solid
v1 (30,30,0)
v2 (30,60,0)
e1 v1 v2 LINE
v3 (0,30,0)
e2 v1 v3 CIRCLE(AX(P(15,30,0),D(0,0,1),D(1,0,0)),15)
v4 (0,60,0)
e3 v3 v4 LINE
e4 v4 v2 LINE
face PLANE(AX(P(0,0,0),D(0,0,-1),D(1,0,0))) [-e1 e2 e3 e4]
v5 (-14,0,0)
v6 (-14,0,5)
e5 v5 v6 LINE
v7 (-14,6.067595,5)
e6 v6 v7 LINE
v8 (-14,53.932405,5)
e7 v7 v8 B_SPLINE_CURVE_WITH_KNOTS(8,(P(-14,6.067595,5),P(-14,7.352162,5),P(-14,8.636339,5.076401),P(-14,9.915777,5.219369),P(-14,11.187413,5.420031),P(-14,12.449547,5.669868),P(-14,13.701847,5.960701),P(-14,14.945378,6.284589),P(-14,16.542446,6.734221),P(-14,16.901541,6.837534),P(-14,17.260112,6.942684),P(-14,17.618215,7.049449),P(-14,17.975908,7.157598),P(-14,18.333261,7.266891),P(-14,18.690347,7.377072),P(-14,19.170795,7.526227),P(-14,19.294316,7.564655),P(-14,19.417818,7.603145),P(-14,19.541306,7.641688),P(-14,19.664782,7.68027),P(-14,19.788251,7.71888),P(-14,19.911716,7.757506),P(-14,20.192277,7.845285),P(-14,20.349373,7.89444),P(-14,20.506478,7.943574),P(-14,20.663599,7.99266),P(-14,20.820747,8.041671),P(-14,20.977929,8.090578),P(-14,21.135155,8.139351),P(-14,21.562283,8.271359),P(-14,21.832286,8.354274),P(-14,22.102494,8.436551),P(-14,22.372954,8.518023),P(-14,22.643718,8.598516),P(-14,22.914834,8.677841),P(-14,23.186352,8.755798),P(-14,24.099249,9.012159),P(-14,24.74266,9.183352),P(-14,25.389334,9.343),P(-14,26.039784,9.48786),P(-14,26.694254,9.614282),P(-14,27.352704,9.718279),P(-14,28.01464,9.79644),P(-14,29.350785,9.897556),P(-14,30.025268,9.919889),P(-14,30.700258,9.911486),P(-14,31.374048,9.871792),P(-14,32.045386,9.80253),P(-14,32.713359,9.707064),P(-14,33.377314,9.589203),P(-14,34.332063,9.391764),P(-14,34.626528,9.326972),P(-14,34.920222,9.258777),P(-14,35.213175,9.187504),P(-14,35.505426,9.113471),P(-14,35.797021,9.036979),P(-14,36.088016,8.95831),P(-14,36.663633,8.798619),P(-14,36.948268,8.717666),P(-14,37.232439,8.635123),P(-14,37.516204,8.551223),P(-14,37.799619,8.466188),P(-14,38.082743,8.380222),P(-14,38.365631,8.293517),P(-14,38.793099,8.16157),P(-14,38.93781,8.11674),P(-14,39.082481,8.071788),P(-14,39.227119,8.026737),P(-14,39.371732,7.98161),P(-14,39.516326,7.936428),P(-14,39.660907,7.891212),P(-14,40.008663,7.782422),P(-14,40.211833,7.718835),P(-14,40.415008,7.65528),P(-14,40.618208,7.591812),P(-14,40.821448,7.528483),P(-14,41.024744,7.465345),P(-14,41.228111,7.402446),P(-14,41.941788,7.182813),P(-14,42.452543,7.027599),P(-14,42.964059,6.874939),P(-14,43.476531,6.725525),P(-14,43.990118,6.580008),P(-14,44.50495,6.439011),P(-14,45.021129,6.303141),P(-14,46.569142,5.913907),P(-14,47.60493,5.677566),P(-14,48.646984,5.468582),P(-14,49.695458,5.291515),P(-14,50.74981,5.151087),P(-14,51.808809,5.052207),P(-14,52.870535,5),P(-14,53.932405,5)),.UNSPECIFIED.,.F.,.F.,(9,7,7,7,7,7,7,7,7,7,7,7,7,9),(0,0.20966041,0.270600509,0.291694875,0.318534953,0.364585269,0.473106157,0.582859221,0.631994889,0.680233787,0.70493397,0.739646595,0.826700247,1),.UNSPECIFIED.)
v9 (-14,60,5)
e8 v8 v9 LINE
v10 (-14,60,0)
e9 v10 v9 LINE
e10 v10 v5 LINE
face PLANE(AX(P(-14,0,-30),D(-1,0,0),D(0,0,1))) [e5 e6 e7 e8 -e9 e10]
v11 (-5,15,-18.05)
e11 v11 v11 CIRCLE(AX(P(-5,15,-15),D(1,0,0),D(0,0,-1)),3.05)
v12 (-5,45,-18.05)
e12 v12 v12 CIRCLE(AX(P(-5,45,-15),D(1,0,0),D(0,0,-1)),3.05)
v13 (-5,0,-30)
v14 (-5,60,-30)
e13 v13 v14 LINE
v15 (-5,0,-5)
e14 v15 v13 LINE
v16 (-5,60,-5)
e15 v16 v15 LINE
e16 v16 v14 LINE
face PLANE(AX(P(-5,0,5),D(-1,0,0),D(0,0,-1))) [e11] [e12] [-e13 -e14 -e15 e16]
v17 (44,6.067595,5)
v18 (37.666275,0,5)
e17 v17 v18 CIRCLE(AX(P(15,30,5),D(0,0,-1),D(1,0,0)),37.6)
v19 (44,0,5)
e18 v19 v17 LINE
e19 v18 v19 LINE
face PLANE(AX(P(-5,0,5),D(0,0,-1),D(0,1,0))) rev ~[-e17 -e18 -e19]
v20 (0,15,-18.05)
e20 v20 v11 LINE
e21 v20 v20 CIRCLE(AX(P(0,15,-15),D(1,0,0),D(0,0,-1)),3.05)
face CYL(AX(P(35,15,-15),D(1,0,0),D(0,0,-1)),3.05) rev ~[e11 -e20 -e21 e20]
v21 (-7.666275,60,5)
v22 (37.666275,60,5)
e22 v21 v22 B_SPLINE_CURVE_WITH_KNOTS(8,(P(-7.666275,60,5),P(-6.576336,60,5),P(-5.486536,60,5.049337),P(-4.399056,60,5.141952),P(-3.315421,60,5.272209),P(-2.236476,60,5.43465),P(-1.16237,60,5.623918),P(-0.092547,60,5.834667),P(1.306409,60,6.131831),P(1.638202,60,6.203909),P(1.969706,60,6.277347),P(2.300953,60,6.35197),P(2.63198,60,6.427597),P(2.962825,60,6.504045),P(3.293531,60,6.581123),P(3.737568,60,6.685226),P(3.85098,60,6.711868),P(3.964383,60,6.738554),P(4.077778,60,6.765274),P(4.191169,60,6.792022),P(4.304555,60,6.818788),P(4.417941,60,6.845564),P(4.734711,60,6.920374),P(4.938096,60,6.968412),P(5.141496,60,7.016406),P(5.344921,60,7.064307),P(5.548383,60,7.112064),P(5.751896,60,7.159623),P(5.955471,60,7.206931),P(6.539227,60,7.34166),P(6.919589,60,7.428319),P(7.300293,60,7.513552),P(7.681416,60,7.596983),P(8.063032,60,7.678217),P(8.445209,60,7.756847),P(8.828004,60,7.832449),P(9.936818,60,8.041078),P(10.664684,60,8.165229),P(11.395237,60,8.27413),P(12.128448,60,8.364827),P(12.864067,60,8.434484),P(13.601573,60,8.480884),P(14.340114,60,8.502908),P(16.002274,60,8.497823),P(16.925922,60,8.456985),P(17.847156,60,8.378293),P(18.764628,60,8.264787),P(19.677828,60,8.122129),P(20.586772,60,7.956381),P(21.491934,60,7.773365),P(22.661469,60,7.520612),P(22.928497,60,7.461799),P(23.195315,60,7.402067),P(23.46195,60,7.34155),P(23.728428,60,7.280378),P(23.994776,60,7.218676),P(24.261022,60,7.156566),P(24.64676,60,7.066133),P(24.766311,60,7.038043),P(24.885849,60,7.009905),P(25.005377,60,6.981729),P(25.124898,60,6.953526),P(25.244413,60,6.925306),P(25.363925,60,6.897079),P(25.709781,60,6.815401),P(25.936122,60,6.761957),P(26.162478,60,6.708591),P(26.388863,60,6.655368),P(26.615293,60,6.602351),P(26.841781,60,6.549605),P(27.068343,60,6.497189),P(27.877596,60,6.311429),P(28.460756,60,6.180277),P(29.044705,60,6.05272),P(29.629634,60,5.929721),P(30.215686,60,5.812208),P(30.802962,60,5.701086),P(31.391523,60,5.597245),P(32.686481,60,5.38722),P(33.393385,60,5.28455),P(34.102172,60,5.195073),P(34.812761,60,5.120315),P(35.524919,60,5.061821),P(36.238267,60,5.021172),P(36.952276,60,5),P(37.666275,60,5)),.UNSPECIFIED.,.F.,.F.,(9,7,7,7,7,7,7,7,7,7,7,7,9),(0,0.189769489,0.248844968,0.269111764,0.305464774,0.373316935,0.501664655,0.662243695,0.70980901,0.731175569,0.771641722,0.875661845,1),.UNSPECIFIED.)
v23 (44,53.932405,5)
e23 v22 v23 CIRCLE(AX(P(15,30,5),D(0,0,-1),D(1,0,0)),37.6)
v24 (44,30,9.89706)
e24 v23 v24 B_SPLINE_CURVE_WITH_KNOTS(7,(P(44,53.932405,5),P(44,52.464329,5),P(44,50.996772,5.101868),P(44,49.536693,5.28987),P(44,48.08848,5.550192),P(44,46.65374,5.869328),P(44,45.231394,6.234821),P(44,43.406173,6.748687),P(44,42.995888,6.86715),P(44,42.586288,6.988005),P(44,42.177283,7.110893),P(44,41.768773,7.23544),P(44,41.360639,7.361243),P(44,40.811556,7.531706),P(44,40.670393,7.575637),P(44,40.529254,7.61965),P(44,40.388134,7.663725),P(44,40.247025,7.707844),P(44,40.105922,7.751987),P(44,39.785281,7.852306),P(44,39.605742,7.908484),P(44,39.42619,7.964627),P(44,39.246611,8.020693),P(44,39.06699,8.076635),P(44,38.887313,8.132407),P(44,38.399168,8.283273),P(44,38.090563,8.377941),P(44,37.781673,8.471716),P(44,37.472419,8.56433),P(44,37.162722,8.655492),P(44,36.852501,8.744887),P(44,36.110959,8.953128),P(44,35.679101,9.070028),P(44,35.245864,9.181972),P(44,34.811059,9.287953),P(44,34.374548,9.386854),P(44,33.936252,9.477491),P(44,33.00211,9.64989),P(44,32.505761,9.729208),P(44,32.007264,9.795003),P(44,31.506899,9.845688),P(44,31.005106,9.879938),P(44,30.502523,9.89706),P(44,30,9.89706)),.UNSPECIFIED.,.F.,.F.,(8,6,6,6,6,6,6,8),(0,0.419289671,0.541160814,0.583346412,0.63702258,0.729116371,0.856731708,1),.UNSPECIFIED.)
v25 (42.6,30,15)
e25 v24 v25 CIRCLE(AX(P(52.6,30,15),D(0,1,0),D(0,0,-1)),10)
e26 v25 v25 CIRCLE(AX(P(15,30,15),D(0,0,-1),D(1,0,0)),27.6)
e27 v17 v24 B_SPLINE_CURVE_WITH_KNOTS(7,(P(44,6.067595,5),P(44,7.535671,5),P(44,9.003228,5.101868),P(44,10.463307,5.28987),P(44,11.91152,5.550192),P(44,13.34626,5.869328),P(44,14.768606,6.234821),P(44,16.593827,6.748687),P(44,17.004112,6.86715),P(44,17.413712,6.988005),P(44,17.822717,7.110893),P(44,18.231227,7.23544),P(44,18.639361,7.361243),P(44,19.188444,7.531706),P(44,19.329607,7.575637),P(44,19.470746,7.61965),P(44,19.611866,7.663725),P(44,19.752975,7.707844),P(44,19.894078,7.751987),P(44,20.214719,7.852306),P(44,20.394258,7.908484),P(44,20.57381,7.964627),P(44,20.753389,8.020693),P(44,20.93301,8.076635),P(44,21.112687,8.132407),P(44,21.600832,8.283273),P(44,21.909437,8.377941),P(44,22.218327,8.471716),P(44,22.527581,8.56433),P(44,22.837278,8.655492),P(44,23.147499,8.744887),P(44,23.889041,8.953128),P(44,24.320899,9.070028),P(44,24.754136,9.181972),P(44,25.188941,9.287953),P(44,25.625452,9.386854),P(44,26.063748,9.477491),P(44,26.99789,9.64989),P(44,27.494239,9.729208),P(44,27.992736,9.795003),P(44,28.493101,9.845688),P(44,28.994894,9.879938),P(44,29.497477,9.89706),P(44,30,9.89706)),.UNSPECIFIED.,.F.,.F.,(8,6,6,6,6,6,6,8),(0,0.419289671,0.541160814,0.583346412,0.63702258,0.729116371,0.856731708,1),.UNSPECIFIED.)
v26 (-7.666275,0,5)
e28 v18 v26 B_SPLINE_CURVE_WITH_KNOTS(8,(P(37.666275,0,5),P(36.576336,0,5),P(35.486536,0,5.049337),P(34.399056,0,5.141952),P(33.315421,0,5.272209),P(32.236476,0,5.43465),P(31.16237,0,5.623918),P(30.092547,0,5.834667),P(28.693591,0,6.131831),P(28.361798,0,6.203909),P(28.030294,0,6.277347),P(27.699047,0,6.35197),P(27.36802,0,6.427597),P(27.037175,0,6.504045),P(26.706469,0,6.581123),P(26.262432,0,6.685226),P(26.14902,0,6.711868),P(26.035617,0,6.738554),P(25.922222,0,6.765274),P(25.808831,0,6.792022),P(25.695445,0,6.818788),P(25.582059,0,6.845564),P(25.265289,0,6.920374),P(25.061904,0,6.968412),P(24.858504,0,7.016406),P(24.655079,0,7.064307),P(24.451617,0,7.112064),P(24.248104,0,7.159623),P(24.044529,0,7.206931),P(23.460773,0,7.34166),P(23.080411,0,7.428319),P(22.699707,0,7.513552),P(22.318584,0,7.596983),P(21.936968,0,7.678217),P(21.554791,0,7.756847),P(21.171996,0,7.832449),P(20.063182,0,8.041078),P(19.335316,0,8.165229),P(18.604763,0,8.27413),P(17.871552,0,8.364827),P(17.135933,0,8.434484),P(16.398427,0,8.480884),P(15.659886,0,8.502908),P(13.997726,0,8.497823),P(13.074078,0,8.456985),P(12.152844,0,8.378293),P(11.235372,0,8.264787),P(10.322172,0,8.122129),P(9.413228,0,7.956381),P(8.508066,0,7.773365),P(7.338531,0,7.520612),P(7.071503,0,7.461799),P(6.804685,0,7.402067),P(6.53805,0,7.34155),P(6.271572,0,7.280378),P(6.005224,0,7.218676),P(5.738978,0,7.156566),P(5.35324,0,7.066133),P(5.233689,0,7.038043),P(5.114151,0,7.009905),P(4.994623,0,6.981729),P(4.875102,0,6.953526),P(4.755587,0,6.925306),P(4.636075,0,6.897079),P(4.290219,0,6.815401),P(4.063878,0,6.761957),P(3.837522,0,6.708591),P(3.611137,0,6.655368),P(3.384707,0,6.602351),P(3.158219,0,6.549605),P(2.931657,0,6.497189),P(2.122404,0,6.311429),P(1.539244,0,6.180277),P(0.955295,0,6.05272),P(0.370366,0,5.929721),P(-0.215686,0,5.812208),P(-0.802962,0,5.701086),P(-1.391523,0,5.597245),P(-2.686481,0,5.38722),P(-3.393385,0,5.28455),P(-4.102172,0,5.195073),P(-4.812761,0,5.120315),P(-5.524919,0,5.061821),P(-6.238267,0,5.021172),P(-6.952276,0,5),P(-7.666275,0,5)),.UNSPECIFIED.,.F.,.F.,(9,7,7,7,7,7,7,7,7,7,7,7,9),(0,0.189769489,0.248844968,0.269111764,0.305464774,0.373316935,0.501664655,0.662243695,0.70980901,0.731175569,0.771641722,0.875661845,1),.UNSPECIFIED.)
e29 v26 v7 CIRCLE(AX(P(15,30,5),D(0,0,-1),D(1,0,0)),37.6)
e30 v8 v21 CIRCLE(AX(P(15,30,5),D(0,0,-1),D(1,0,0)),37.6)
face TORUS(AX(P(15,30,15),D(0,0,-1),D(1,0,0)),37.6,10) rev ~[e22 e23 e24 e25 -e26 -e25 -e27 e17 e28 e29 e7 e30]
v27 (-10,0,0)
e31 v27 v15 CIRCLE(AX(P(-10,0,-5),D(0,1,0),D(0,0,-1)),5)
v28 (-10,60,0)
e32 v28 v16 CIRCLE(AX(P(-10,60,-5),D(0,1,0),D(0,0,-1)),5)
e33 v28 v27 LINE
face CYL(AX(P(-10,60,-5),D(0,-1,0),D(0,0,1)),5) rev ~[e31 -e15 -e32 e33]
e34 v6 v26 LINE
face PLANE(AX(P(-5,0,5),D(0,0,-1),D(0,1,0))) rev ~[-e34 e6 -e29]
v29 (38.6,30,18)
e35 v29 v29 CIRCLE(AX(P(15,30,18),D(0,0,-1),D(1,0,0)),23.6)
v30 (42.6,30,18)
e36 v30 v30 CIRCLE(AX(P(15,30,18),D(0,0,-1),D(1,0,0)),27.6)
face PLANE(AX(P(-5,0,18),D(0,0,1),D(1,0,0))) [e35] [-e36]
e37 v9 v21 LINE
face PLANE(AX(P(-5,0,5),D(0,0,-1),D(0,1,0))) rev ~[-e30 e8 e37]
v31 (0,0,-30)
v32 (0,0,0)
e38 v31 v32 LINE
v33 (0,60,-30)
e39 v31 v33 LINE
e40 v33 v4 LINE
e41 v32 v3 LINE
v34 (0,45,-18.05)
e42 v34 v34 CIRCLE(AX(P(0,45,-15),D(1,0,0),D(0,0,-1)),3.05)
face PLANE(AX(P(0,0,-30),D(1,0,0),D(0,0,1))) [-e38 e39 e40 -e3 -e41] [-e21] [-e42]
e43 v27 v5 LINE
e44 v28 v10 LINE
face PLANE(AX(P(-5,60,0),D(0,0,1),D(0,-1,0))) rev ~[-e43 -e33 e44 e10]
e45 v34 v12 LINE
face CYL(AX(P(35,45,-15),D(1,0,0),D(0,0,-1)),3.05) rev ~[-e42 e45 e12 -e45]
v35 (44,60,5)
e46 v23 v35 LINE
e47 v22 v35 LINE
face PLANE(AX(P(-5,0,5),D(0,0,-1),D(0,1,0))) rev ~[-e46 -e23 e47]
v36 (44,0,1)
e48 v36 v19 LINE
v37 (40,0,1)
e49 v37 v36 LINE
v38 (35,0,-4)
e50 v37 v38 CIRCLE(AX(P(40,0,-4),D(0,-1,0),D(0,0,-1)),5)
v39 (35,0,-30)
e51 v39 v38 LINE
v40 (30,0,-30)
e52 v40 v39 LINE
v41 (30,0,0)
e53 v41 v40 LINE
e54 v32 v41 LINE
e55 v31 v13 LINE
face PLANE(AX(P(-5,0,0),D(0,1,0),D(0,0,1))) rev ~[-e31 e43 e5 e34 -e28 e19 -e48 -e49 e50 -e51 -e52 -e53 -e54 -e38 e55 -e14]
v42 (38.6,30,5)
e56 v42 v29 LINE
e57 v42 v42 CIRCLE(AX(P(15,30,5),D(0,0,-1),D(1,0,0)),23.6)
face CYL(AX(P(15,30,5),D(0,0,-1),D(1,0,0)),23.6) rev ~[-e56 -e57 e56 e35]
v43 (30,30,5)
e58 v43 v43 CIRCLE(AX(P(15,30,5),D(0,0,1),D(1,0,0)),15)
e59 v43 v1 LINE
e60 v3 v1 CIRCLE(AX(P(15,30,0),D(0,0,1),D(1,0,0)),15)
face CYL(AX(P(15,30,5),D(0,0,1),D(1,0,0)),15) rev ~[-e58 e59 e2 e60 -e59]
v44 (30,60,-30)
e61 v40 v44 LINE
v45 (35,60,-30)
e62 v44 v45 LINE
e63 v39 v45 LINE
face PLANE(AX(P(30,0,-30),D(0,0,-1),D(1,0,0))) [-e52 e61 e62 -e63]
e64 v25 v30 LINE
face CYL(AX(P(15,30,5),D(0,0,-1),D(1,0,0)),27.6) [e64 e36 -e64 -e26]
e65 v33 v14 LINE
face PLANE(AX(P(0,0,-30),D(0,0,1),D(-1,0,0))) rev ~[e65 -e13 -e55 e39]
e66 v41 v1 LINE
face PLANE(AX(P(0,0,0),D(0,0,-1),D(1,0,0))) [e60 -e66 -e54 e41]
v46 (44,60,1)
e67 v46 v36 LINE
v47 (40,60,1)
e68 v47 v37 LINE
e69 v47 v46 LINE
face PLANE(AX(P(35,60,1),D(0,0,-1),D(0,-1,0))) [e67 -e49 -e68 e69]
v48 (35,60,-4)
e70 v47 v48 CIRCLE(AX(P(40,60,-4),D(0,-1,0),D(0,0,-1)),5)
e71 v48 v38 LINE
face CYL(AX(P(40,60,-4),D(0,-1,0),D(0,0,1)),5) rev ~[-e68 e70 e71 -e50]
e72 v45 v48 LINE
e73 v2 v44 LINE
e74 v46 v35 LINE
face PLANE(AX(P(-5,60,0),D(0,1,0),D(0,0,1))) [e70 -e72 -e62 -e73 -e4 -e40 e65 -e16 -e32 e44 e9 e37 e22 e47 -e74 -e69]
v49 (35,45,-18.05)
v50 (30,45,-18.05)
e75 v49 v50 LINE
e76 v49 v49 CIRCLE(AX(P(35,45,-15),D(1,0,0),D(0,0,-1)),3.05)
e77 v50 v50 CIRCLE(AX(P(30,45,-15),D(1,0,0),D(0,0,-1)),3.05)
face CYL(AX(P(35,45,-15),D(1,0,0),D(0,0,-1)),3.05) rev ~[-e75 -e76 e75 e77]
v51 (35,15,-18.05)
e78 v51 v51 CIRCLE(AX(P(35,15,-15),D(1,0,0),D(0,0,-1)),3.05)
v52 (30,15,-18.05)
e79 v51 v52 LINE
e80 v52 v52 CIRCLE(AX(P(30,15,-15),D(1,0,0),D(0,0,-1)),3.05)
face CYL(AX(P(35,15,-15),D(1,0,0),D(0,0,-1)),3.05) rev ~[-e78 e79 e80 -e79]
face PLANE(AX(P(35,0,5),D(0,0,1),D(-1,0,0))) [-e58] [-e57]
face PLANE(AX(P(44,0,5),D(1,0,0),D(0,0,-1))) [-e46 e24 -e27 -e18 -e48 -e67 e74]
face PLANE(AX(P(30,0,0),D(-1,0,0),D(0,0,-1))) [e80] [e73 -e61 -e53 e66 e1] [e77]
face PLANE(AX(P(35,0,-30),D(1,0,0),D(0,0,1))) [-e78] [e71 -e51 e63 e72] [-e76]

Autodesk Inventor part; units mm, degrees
ref_plane "YZ Plane" through (0, 0, 0) normal (1, 0, 0) x (0, 1, 0)
ref_plane "XZ Plane" through (0, 0, 0) normal (0, 1, 0) x (-1, 0, 0)
ref_plane "XY Plane" through (0, 0, 0) normal (0, 0, 1) x (1, 0, 0)
sketch "Sketch1" plane through (0, 0, 0) normal (0, 1, 0) x (-1, 0, 0)
  line L0 (0, 0) -> (-30, 0)
  line L1 (-30, 0) -> (-30, -30)
  line L2 (-30, -30) -> (0, -30)
  line L3 (0, -30) -> (0, 0)
  line L4 (-35, -35) -> (-35, 5)
  line L5 (-35, 5) -> (5, 5)
  line L6 (5, 5) -> (5, -35)
  line L7 (5, -35) -> (-35, -35)
  line L8 (0, -30) -> (5, -30)
  line L9 (-30, -30) -> (-35, -30)
  dimension "d0" = 30
  dimension "d1" = 30
  dimension "d2" = 5
extrude "Extrusion1" add sketch "Sketch1" along normal blind 60 contours L0 L1 L9 L4 L5 L6 L8 L3
sketch "Sketch2" plane through (-5, 0, 5) normal (0, 0, 1) x (1, 0, 0)
  line L0 (0, 0) -> (40, 0) projected
  line L1 (40, 0) -> (40, 60) projected
  line L2 (0, 60) -> (40, 60) projected
  line L3 (0, 0) -> (0, 60) projected
  line L4 (0, 60) -> (40, 60) projected
  line L5 (0, 0) -> (40, 0) projected
  line L6 (0, 60) -> (40, 0) construction
  circle A0 centre (20, 30) radius 23.6
  circle A1 centre (20, 30) radius 27.6
  dimension "d5" = 47.2
  dimension "d6" = 4
extrude "Extrusion2" add sketch "Sketch2" along normal blind 13 contours A1 L3 A0 | L3 A0 L1 A1 | L1 A0 A1 | A1 L1 A0 L3
sketch "Sketch3" plane through (35, 0, 5) normal (1, 0, 0) x (0, 0, -1)
  line L0 (5, 60) -> (35, 60) projected
  line L1 (35, 60) -> (0, 60) projected
  line L2 (5, 0) -> (35, 0) projected
  line L3 (0, 60) -> (4, 60)
  line L4 (4, 60) -> (4, 0)
  line L5 (4, 0) -> (0, 0)
  line L6 (0, 0) -> (0, 60)
  point P0 (4, 60)
  dimension "d10" = 4
extrude "Extrusion3" add sketch "Sketch3" along normal blind 9
sketch "Sketch4" plane through (-5, 0, -30) normal (-1, 0, 0) x (0, 0, 1)
  line L0 (0, 60) -> (35, 60) projected
  line L1 (30, 0) -> (0, 0) projected
  line L2 (35, 60) -> (30, 60)
  line L3 (30, 60) -> (30, 0)
  line L4 (30, 0) -> (35, 0)
  line L5 (35, 0) -> (35, 60)
extrude "Extrusion4" add sketch "Sketch4" along normal blind 9
sketch "Sketch5" plane through (15, 30, 5) normal (0, 0, 1) x (1, 0, 0)
  circle A0 centre (0, 0) radius 23.6 projected
  circle A1 centre (0, 0) radius 15
  point P0 (-15, -30)
  dimension "d15" = 30
extrude "Extrusion5" cut sketch "Sketch5" against normal blind 9 contours A1
fillet "Fillet1" radius 10 1 edges at (-12.6, 30, 5)
sketch "Sketch7" plane through (35, 0, -30) normal (1, 0, 0) x (0, 0, -1)
  line L0 (-31, 60) -> (-31, 0) projected
  line L1 (-31, 0) -> (0, 0) projected
  line L2 (0, 0) -> (0, 60) projected
  line L3 (-31, 60) -> (0, 60) projected
  line L4 (-30, 0) -> (0, 0) projected
  line L5 (-15, 0) -> (-15, 15) construction
  line L6 (-15, 15) -> (-15, 45) construction
  line L7 (-15, 45) -> (-15, 60) construction
  line L8 (0, 60) -> (-31, 60) projected
  circle A0 centre (-15, 15) radius 3.05
  circle A1 centre (-15, 45) radius 3.05
  dimension "d19" = 30
  dimension "d20" = 6.1
extrude "Extrusion6" cut sketch "Sketch7" against normal blind 40 contours A0 | A1
fillet "Fillet2" radius 5 2 edges at (-5, 30, 0) (35, 30, 1)
properties part number "Bearing holder_3DPrint"
